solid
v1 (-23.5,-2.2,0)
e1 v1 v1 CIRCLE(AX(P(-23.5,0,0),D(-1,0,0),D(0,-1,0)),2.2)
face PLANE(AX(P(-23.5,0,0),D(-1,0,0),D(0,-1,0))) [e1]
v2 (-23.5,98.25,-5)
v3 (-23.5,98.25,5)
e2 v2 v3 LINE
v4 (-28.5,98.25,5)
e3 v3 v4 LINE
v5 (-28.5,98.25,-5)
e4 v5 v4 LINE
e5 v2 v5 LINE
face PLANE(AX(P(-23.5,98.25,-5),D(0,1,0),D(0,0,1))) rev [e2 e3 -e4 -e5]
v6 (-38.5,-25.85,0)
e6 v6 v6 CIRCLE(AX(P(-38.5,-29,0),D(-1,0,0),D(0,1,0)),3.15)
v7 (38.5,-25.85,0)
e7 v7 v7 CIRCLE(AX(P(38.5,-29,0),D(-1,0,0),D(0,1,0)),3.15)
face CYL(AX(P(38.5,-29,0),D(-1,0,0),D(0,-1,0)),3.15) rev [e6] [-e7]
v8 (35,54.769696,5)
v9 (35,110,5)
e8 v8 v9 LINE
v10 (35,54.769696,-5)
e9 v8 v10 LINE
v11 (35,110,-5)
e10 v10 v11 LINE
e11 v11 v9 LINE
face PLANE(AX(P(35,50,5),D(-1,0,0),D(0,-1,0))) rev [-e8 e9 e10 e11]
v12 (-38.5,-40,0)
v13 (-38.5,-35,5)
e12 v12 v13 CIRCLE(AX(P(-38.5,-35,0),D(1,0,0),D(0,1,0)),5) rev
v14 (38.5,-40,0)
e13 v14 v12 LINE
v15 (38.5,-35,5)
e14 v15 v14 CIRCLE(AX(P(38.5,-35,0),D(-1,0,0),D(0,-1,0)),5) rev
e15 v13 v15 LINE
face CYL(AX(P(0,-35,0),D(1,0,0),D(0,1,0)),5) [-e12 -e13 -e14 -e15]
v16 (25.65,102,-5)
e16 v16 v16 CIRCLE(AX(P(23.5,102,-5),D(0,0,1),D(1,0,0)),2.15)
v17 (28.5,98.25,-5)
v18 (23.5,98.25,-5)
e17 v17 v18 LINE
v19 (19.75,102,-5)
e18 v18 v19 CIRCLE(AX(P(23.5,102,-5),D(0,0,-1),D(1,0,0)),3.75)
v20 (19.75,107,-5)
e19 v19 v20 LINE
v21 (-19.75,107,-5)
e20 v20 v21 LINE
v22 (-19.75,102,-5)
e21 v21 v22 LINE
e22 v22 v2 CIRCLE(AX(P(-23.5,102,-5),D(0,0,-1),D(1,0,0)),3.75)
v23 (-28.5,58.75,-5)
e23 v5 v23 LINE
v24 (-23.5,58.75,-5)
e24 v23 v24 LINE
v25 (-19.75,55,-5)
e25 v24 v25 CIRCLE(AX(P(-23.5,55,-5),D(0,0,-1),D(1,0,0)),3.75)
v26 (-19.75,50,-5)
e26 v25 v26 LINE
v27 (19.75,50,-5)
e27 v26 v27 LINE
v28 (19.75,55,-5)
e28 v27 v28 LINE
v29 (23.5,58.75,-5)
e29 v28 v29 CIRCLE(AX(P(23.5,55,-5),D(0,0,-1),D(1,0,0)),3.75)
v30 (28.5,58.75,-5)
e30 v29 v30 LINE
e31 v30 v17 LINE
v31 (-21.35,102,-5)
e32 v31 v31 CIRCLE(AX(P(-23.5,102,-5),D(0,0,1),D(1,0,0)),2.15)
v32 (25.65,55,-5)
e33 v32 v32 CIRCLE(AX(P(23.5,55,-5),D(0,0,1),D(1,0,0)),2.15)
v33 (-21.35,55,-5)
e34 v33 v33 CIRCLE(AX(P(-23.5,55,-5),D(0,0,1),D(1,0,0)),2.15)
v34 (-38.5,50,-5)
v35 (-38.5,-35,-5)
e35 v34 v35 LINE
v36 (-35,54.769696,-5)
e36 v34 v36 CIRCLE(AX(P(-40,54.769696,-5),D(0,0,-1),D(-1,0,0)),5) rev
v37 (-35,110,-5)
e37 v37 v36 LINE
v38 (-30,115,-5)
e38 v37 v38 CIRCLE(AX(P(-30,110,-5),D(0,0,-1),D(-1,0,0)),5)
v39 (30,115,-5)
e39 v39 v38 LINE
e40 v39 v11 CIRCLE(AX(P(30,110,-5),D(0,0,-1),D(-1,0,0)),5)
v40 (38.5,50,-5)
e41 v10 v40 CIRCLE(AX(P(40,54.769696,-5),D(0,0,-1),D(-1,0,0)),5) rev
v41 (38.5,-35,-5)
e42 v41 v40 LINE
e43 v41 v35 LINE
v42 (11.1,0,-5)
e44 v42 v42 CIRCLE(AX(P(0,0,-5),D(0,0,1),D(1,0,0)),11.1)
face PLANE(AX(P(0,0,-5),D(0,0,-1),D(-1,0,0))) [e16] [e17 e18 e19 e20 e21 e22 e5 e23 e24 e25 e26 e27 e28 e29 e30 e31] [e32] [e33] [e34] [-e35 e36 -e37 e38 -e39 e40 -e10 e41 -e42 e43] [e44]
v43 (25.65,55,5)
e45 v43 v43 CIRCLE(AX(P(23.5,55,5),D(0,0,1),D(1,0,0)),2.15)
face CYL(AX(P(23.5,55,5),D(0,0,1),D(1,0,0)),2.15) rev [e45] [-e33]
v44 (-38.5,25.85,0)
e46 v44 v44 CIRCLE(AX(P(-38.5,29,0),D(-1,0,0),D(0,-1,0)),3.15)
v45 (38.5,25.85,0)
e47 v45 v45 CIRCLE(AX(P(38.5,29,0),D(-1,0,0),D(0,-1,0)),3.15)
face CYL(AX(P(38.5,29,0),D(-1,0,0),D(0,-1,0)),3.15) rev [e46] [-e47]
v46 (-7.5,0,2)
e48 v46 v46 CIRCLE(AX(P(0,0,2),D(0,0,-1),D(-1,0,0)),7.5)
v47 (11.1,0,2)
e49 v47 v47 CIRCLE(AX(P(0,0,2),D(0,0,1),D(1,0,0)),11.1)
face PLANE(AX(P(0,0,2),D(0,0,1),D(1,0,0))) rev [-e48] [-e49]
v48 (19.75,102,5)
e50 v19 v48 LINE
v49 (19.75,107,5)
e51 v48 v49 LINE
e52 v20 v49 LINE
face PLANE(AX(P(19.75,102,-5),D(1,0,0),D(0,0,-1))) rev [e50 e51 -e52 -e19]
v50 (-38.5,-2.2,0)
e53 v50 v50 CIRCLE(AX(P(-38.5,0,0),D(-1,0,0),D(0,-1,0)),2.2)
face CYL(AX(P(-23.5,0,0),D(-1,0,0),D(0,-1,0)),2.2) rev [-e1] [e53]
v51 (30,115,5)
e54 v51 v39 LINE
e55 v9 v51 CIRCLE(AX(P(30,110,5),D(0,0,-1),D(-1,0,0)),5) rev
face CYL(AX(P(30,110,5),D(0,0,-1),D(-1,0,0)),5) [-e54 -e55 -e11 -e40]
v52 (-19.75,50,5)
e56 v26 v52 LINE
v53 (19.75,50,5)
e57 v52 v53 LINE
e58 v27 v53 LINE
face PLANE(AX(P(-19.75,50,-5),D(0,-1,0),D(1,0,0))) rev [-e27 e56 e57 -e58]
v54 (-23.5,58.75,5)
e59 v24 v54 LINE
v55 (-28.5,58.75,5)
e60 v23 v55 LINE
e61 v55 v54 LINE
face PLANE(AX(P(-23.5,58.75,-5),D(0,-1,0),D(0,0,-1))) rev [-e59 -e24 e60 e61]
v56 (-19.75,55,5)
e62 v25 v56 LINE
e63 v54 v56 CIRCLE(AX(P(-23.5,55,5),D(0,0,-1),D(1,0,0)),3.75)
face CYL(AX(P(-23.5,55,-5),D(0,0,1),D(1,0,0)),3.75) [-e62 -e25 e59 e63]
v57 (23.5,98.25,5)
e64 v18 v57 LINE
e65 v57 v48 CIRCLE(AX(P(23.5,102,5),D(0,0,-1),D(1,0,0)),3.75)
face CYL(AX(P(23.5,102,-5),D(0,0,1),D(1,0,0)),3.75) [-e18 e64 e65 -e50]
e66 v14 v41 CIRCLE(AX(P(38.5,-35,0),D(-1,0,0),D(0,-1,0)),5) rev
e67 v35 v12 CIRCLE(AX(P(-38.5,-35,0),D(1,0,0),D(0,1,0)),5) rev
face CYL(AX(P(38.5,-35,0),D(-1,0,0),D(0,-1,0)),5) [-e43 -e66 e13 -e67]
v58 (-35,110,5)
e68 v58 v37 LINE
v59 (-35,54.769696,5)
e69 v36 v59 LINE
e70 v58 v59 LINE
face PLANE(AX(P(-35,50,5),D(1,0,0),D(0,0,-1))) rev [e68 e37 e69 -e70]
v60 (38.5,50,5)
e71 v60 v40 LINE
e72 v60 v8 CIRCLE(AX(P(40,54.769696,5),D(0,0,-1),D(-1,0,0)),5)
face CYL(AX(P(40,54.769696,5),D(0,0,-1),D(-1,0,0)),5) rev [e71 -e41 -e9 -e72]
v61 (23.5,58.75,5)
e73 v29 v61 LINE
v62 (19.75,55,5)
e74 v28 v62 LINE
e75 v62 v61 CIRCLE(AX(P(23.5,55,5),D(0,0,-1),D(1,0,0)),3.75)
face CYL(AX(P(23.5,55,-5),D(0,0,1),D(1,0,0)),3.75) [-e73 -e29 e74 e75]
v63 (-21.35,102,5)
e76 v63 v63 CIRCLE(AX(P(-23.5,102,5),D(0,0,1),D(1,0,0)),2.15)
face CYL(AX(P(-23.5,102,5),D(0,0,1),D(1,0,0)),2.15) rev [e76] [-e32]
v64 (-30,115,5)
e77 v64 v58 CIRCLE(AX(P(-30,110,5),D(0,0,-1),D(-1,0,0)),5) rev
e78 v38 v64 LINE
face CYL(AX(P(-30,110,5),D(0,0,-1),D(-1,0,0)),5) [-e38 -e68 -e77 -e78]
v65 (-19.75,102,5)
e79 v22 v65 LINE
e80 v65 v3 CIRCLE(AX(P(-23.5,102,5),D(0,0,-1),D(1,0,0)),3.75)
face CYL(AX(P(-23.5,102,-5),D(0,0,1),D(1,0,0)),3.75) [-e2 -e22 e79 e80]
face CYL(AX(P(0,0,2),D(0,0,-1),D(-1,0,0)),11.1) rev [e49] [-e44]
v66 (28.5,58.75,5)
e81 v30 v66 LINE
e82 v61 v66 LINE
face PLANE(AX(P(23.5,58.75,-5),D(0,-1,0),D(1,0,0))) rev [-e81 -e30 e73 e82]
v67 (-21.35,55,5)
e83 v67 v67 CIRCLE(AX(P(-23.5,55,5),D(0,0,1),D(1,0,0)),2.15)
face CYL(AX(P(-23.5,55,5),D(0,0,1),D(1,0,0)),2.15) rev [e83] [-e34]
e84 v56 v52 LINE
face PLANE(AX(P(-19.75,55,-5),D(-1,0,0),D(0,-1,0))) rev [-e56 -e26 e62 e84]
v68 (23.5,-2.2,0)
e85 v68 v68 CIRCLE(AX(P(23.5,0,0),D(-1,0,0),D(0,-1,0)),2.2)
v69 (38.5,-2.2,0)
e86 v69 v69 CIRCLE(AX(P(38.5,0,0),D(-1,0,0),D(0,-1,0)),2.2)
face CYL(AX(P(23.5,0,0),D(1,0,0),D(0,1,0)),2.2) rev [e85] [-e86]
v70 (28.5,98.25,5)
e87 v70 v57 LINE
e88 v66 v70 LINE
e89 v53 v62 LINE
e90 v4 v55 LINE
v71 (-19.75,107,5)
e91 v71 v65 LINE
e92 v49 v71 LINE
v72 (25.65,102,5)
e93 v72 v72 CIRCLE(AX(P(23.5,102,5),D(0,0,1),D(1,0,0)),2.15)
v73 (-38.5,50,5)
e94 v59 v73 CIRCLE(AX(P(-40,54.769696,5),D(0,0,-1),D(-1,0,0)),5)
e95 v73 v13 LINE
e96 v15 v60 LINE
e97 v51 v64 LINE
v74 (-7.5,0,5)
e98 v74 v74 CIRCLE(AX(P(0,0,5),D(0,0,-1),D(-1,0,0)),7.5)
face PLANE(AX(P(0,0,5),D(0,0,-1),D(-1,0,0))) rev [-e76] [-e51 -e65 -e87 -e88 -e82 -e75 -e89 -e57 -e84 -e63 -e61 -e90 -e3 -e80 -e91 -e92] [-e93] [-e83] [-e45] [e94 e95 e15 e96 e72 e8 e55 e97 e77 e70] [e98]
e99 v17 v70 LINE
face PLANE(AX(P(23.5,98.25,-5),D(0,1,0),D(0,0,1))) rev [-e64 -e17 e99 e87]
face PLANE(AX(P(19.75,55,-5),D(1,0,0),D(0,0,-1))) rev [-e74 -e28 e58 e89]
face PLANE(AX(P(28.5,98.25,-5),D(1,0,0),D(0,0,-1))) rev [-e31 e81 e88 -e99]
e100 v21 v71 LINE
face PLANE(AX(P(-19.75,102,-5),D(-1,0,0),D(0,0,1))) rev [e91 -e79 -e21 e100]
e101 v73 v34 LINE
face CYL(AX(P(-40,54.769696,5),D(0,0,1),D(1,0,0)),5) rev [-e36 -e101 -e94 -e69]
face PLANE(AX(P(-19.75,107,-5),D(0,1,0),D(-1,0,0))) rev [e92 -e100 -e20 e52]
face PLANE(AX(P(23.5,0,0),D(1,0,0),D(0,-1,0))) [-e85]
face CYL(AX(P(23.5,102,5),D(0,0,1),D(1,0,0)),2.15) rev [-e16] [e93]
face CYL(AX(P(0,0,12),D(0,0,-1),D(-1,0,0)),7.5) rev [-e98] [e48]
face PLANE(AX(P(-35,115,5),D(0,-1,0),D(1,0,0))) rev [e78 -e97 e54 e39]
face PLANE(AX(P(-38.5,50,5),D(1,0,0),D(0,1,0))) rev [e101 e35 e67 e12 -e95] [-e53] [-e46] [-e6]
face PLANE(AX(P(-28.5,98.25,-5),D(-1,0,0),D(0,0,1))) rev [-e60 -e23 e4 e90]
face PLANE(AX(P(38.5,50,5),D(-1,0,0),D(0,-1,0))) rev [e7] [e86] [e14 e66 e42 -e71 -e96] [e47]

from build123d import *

# Parameters (mm, degrees)
AUFSATZ_LINEAR_AUSTRAGEN1_DEPTH  = 5
SKIZZE2_R                        = 3.15
SCHNITT_LINEAR_AUSTRAGEN1_DEPTH  = 139.488266651
SKIZZE3_R                        = 2.2
SCHNITT_LINEAR_AUSTRAGEN2_DEPTH  = 15
VERRUNDUNG2_R                    = 5
SCHNITT_LINEAR_AUSTRAGEN3_DEPTH  = 122.685044274
F_4_3_4_3_DURCHMESSER_BOHRUNG1_D = 4.3
VERRUNDUNG3_R                    = 5
VERRUNDUNG4_R                    = 5
SKIZZE8_R                        = 11.1
SCHNITT_LINEAR_AUSTRAGEN4_DEPTH  = 7
SKIZZE9_R                        = 7.5
SCHNITT_LINEAR_AUSTRAGEN5_DEPTH  = 10


# Some blends are built 0.0001 mm under size
with BuildPart() as part:
    # Skizze1 → Aufsatz-Linear austragen1 (new, symmetric)
    with BuildSketch(Plane.XY):
        Polygon((38.5, 50), (35, 50), (35, 115), (-35, 115), (-35, 50), (-38.5, 50), (-38.5, -40), (38.5, -40), align=None)
    extrude(amount=AUFSATZ_LINEAR_AUSTRAGEN1_DEPTH, both=True)

    # Skizze2 → Schnitt-Linear austragen1 (cut, through all)
    with BuildSketch(Plane.ZY.offset(38.5)):
        with Locations(Location((0, 29, 0), (0, 0, 270))):
            Circle(SKIZZE2_R)
        with Locations(Location((0, -29, 0), (0, 0, 90))):
            Circle(SKIZZE2_R)
    extrude(amount=-SCHNITT_LINEAR_AUSTRAGEN1_DEPTH, mode=Mode.SUBTRACT)

    # Skizze3 → Schnitt-Linear austragen2 (cut)
    with BuildSketch(Plane.ZY.offset(38.5)):
        with Locations(Location((0, 0, 0), (0, 0, 270))):
            Circle(SKIZZE3_R)
    schnitt_linear_austragen2 = extrude(amount=-SCHNITT_LINEAR_AUSTRAGEN2_DEPTH, mode=Mode.SUBTRACT)

    # Spiegeln1: Schnitt-Linear austragen2 across plane
    add(schnitt_linear_austragen2.mirror(Plane(origin=(0, 0, 0), x_dir=(0, 0, 1), z_dir=(1, 0, 0))), mode=Mode.SUBTRACT)

    # Verrundung2
    verrundung2_edges = [part.edges().sort_by_distance(p)[0] for p in [
        (0, -40, -5),
        (0, -40, 5),
    ]]
    fillet(verrundung2_edges, radius=VERRUNDUNG2_R - 0.0001)  # a hair under: the kernel refuses the full size

    # Skizze5 → Schnitt-Linear austragen3 (cut, through all)
    with BuildSketch(Plane.XY.offset(5)):
        with BuildLine():
            Line((19.75, 102), (19.75, 107))
            Line((19.75, 107), (-19.75, 107))
            Line((-19.75, 107), (-19.75, 102))
            ThreePointArc((-19.75, 102), (-20.848349571, 99.348349571), (-23.5, 98.25))
            Line((-23.5, 98.25), (-28.5, 98.25))
            Line((-28.5, 98.25), (-28.5, 58.75))
            Line((-28.5, 58.75), (-23.5, 58.75))
            ThreePointArc((-23.5, 58.75), (-20.848349571, 57.651650429), (-19.75, 55))
            Line((-19.75, 55), (-19.75, 50))
            Line((-19.75, 50), (19.75, 50))
            Line((19.75, 50), (19.75, 55))
            ThreePointArc((19.75, 55), (20.848349571, 57.651650429), (23.5, 58.75))
            Line((23.5, 58.75), (28.5, 58.75))
            Line((28.5, 58.75), (28.5, 98.25))
            Line((28.5, 98.25), (23.5, 98.25))
            ThreePointArc((23.5, 98.25), (20.848349571, 99.348349571), (19.75, 102))
        make_face()
    extrude(amount=-SCHNITT_LINEAR_AUSTRAGEN3_DEPTH, mode=Mode.SUBTRACT)

    # Ø4.3 (4.3) Durchmesser Bohrung1 (through all)
    with Locations(Plane.XY.offset(5)):
        with Locations((-23.5, 102), (-23.5, 55), (23.5, 55), (23.5, 102)):
            Hole(F_4_3_4_3_DURCHMESSER_BOHRUNG1_D / 2)

    # Verrundung3
    verrundung3_edges = [part.edges().sort_by_distance(p)[0] for p in [
        (-35, 115, 0),
        (35, 115, 0),
    ]]
    fillet(verrundung3_edges, radius=VERRUNDUNG3_R)

    # Verrundung4
    # the kernel refuses this fillet: 5 mm, written as the material it adds along each edge
    with BuildSketch(Plane(origin=(35, 50, -5), x_dir=(0, 1, 0), z_dir=(0, 0, 1))) as verrundung4_piece_1:
        with BuildLine():
            CenterArc((4.769696007, -5), VERRUNDUNG4_R, 90, 72.542396876)
            Line((0, -3.5), (-0.09539392, -3.47))
            ThreePointArc((-0.09539392, -3.47), (-0.1, -1.75), (-0.1, 0))
            Line((-0.1, 0), (0, 0.1))
            Line((0, 0.1), (4.769696007, 0.1))
            Line((4.769696007, 0.1), (4.769696007, 0))
        make_face()
    extrude(amount=10)
    with BuildSketch(Plane(origin=(-35, 50, -5), x_dir=(0, 1, 0), z_dir=(0, 0, 1))) as verrundung4_piece_2:
        with BuildLine():
            CenterArc((4.769696007, 5), VERRUNDUNG4_R, 197.457603124, 72.542396876)
            Line((0, 3.5), (-0.09539392, 3.47))
            ThreePointArc((-0.09539392, 3.47), (-0.1, 1.75), (-0.1, 0))
            Line((-0.1, 0), (0, -0.1))
            Line((0, -0.1), (4.769696007, -0.1))
            Line((4.769696007, -0.1), (4.769696007, 0))
        make_face()
    extrude(amount=10)

    # Skizze8 → Schnitt-Linear austragen4 (cut)
    with BuildSketch(Plane.XY.offset(-5)):
        Circle(SKIZZE8_R)
    extrude(amount=SCHNITT_LINEAR_AUSTRAGEN4_DEPTH, mode=Mode.SUBTRACT)

    # Skizze9 → Schnitt-Linear austragen5 (cut)
    with BuildSketch(Plane(origin=(0, 0, 2), x_dir=(-1, 0, 0), z_dir=(0, 0, -1))):
        Circle(SKIZZE9_R)
    extrude(amount=-SCHNITT_LINEAR_AUSTRAGEN5_DEPTH, mode=Mode.SUBTRACT)


solid = part.part
